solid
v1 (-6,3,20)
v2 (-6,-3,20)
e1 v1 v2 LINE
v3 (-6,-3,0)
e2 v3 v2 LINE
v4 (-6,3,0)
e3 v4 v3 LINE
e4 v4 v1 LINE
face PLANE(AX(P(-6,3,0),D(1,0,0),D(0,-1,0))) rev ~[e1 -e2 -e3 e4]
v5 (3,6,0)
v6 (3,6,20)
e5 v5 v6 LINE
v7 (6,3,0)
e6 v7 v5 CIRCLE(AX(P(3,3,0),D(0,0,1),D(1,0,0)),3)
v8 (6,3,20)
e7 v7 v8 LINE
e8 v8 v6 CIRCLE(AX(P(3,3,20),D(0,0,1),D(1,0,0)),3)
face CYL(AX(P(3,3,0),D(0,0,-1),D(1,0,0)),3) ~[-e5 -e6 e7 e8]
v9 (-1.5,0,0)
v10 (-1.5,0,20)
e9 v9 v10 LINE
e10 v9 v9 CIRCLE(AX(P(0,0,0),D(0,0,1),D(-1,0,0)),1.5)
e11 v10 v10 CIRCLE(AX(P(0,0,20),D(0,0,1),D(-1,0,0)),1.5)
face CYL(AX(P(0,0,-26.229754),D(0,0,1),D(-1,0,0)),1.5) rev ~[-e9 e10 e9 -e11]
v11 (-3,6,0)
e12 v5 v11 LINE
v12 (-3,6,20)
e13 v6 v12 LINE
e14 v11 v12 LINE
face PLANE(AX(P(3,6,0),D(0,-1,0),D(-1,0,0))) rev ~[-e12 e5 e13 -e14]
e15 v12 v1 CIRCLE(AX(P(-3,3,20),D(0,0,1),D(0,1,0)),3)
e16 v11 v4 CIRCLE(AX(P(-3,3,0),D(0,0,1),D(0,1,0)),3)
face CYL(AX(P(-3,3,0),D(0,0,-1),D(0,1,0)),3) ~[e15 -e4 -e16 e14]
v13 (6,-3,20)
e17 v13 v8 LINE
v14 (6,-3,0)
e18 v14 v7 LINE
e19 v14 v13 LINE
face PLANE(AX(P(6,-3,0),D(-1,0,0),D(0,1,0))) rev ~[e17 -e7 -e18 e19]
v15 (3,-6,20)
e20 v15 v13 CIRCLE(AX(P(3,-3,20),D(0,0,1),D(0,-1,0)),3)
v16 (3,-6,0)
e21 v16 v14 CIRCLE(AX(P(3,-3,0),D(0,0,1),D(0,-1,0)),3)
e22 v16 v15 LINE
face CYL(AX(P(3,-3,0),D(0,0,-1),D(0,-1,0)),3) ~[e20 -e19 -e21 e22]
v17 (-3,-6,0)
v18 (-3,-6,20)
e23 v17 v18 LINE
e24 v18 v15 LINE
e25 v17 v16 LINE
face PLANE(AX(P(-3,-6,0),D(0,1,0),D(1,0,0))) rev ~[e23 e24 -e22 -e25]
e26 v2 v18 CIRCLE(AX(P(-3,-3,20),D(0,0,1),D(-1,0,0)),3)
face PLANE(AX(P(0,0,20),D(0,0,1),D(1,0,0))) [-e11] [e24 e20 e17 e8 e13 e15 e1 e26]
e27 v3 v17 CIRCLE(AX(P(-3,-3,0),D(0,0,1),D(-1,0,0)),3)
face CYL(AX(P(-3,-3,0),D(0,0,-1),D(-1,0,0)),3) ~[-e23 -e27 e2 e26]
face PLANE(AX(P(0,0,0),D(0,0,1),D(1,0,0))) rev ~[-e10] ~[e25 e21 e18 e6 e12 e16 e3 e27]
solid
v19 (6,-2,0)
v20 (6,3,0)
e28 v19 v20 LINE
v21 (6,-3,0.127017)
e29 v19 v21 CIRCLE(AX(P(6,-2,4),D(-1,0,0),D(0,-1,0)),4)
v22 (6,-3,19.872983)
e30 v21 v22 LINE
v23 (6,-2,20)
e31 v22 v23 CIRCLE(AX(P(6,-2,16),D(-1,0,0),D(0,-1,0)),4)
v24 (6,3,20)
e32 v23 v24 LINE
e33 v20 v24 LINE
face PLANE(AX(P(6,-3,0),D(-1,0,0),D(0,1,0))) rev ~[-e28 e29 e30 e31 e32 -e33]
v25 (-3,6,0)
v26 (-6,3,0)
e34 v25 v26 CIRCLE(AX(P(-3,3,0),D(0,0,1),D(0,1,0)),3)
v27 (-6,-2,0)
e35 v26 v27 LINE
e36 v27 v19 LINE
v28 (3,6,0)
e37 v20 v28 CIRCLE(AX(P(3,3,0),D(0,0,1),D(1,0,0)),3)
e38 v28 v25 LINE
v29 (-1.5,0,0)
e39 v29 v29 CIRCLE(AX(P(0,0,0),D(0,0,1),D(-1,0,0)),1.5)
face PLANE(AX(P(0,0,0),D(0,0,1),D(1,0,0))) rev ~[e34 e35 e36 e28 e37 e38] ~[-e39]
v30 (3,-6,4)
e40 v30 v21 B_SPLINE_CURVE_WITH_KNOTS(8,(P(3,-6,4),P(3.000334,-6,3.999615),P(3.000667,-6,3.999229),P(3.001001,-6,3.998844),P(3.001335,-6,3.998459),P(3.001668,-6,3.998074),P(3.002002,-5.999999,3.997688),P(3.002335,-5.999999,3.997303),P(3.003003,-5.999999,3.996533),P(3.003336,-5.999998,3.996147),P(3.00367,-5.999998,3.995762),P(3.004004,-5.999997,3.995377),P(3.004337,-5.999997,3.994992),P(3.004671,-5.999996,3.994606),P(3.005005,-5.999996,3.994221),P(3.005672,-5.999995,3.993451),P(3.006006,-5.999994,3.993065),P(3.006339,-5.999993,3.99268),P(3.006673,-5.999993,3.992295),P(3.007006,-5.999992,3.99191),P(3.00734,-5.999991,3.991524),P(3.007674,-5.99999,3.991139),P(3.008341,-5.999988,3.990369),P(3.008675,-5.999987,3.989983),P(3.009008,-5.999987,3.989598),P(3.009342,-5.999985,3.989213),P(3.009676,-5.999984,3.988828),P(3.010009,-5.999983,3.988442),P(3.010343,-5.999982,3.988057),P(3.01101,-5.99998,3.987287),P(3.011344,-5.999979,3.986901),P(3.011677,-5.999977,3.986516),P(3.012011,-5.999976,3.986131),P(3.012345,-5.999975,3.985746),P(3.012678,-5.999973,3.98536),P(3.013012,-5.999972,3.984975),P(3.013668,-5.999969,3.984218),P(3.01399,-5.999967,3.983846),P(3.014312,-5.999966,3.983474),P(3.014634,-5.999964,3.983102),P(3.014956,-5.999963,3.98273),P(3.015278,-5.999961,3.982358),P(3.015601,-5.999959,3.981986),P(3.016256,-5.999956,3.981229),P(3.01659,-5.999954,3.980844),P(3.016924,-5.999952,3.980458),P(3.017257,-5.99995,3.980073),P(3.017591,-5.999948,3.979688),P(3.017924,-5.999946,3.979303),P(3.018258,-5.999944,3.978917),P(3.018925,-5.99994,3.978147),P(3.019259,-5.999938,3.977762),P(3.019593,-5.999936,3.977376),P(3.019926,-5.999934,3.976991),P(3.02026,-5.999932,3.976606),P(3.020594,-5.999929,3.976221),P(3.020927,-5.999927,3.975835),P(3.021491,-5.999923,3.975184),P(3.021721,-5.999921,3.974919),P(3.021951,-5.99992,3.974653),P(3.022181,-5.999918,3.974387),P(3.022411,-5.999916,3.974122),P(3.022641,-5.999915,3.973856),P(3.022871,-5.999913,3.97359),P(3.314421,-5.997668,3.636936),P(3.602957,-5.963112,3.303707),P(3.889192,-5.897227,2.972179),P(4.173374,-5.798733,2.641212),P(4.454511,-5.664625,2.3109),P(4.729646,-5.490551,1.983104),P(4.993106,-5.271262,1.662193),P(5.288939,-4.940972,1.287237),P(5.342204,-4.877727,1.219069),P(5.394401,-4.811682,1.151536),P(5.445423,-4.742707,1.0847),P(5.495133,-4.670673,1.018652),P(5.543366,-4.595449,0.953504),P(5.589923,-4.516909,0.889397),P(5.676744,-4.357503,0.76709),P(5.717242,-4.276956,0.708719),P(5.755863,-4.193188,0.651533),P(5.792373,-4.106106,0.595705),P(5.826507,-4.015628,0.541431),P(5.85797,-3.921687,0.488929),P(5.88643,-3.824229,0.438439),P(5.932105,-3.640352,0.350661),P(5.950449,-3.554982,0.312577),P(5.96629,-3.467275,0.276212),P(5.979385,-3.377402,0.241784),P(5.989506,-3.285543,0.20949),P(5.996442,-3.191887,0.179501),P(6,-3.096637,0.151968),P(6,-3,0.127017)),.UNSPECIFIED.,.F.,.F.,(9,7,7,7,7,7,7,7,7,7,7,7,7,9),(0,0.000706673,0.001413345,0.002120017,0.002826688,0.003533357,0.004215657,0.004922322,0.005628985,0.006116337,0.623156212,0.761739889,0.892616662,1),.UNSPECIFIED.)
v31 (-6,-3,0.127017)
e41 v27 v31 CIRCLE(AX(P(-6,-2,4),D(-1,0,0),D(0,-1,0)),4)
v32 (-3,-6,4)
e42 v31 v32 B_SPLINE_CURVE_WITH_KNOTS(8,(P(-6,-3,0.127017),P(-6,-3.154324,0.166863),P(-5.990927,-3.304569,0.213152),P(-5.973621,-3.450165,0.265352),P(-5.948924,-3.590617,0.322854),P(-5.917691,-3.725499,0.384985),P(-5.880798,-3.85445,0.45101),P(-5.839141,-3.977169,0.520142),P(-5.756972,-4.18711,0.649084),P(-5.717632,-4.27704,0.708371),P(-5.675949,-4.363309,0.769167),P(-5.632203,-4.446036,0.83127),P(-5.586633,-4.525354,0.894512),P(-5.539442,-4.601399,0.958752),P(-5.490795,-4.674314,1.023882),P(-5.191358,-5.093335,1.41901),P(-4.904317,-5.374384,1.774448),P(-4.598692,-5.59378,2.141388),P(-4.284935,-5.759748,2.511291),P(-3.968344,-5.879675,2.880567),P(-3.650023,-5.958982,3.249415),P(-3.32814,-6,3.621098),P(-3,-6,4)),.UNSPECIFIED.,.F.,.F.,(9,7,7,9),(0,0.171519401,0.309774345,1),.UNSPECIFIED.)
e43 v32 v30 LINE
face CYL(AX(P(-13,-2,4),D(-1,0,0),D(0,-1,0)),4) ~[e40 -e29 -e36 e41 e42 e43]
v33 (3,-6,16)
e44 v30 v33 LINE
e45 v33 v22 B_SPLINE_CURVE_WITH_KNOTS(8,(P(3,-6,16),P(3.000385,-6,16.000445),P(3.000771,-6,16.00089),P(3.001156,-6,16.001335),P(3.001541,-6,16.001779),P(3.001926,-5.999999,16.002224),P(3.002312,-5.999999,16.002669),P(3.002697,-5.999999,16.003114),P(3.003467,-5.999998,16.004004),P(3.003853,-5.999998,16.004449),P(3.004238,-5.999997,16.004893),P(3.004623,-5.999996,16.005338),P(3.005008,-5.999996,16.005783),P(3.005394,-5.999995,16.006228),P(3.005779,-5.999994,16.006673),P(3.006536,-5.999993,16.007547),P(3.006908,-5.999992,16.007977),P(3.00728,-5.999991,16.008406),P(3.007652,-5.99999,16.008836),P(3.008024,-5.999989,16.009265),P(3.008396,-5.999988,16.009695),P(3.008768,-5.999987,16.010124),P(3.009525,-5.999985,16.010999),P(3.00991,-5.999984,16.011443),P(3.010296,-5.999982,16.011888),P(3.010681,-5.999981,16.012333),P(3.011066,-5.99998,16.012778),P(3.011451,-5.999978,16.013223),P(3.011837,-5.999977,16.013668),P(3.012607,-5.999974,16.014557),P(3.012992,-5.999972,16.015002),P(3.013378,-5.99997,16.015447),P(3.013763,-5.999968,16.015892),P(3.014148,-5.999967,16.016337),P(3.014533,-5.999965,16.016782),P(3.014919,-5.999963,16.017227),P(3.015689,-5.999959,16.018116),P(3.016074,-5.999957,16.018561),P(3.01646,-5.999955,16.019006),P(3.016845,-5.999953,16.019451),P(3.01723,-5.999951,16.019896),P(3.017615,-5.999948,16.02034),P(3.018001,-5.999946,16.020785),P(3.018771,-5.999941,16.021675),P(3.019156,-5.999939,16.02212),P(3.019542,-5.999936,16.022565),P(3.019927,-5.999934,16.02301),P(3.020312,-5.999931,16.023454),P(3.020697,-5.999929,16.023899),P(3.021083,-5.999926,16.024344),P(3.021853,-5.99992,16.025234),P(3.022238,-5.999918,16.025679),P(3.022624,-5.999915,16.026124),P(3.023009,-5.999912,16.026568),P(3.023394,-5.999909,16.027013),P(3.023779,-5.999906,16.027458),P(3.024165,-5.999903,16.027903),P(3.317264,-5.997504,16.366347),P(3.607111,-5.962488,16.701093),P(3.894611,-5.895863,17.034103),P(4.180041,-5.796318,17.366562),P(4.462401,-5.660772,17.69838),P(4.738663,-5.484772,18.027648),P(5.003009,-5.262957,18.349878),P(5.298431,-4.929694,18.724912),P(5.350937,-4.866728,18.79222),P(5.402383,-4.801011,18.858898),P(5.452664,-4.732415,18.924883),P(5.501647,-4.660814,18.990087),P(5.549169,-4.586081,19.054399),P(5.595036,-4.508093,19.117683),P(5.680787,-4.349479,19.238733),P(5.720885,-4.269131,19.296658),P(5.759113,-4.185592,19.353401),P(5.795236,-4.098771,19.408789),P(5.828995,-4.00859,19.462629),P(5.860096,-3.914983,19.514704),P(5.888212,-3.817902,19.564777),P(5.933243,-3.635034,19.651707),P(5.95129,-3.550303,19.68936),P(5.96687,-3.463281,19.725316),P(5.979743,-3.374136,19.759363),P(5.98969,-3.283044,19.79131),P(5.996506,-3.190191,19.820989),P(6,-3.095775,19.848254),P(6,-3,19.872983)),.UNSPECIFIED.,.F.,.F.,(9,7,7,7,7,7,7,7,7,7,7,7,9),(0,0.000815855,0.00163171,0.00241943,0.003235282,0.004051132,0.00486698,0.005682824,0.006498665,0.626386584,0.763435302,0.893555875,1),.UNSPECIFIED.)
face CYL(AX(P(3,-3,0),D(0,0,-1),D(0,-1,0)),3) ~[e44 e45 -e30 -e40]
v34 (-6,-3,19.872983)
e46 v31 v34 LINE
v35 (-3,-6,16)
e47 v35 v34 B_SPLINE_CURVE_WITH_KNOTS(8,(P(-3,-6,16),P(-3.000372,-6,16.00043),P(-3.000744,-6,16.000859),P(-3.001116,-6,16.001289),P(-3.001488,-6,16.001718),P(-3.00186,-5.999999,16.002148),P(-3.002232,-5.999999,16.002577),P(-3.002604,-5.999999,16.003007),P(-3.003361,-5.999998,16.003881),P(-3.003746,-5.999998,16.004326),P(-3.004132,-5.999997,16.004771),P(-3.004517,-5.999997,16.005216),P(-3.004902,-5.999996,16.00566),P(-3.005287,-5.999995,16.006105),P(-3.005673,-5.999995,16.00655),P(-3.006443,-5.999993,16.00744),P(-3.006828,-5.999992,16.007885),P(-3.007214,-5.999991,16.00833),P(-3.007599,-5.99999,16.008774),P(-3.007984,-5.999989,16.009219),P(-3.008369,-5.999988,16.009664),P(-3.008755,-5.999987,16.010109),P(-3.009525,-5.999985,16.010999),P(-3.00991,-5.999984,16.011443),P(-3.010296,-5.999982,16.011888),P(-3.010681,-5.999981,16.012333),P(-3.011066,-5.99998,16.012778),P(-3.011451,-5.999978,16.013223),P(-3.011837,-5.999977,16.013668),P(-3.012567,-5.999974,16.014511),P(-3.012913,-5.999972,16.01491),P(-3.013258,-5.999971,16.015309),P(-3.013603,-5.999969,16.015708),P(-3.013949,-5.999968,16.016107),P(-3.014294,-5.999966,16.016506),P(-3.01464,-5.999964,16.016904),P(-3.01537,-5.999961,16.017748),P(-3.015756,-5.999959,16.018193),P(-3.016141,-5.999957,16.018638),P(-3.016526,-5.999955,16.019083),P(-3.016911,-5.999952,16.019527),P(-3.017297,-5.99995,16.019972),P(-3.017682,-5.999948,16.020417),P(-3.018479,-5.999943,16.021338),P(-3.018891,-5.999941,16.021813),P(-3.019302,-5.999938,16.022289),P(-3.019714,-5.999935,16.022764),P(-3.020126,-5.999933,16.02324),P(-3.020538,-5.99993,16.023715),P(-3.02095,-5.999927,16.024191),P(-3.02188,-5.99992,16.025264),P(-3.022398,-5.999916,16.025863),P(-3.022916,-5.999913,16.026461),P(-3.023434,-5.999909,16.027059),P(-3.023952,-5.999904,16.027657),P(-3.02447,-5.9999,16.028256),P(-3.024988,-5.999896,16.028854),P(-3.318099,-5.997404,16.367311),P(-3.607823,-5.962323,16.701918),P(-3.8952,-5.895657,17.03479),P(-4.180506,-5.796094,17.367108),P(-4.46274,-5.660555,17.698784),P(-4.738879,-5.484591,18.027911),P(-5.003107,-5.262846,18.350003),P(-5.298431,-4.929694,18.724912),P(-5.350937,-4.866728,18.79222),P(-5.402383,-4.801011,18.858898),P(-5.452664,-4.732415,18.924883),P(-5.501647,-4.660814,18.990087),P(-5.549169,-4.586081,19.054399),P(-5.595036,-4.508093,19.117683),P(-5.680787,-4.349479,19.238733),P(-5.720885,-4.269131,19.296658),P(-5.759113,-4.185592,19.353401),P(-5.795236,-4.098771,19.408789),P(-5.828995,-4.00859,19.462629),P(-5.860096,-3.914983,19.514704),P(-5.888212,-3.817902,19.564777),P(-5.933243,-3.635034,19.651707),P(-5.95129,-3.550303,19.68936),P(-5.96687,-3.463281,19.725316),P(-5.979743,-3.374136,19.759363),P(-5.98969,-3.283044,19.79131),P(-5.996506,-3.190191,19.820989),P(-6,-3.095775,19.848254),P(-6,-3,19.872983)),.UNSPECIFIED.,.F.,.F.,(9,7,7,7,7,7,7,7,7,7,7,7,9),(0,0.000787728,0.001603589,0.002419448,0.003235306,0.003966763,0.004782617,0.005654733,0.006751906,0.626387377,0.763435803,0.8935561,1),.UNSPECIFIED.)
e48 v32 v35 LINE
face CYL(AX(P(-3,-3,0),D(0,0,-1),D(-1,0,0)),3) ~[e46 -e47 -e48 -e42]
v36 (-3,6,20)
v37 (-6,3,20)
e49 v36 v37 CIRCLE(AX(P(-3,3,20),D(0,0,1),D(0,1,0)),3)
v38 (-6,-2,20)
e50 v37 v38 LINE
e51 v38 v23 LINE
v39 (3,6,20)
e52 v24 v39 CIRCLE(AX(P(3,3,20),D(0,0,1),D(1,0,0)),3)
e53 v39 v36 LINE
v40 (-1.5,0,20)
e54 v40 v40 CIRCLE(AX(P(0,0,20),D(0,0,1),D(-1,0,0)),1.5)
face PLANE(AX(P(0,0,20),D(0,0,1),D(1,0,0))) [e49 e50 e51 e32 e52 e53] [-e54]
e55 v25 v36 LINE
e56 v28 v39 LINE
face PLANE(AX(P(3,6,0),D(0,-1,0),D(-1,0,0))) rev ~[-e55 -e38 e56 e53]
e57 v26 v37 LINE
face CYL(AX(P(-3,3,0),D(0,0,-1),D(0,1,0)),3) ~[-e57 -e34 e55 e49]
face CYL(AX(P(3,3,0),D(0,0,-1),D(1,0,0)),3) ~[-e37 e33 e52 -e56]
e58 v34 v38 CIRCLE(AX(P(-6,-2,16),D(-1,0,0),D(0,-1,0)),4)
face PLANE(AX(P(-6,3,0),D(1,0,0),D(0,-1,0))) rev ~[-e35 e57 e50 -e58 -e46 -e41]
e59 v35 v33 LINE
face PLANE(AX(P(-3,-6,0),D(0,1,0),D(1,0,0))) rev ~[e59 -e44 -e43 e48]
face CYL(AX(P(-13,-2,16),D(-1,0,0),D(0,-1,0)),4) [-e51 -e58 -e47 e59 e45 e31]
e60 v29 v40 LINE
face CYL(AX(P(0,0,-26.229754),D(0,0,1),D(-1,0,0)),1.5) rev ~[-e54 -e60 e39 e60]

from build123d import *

# Parameters (mm, degrees)
F1_DEPTH    = 20
F2_DEPTH    = 20
F3_T1_DEPTH = 26
F4_D        = 3
F4_2_D      = 3


# Not quite as in the source:
# - a fillet or chamfer that OpenCascade refuses, or shapes differently, is made with other operations: its cross-section is extruded or revolved along the edge and cut away or added


with BuildPart() as f1:
    # F0 (on Top) → F1 (new body)
    with BuildSketch(Plane.XY):
        with BuildLine():
            ThreePointArc((6, 3), (5.1213203436, 5.1213203436), (3, 6))
            Line((3, 6), (-3, 6))
            ThreePointArc((-3, 6), (-5.1213203436, 5.1213203436), (-6, 3))
            Line((-6, 3), (-6, -3))
            ThreePointArc((-6, -3), (-5.1213203436, -5.1213203436), (-3, -6))
            Line((-3, -6), (3, -6))
            ThreePointArc((3, -6), (5.1213203436, -5.1213203436), (6, -3))
            Line((6, -3), (6, 3))
        make_face()
    extrude(amount=F1_DEPTH)

    # F4 (through all)
    with Locations(Plane(origin=(0, 0, 0), x_dir=(1, 0, 0), z_dir=(0, 0, -1))):
        with Locations((0, 0)):
            Hole(F4_D / 2)


with BuildPart() as f2:
    # F0 (on Top) → F2 (new body)
    with BuildSketch(Plane.XY):
        with BuildLine():
            ThreePointArc((6, 3), (5.1213203436, 5.1213203436), (3, 6))
            Line((3, 6), (-3, 6))
            ThreePointArc((-3, 6), (-5.1213203436, 5.1213203436), (-6, 3))
            Line((-6, 3), (-6, -3))
            ThreePointArc((-6, -3), (-5.1213203436, -5.1213203436), (-3, -6))
            Line((-3, -6), (3, -6))
            ThreePointArc((3, -6), (5.1213203436, -5.1213203436), (6, -3))
            Line((6, -3), (6, 3))
        make_face()
    extrude(amount=F2_DEPTH)

    # F3: fillet of radius 4 on 2 edges, made by hand

    # F3_s2 → F3_t1 (cut)
    with BuildSketch(Plane.YZ.offset(-13)):
        with BuildLine():
            ThreePointArc((-6, 16), (-4.8284271247, 18.8284271247), (-2, 20))
            Line((-2, 20), (-6, 20))
            Line((-6, 20), (-6, 16))
        make_face()
        with BuildLine():
            ThreePointArc((-6, 4), (-4.8284271247, 1.1715728753), (-2, 0))
            Line((-2, 0), (-6, 0))
            Line((-6, 0), (-6, 4))
        make_face()
    extrude(amount=F3_T1_DEPTH, mode=Mode.SUBTRACT)

    # F4#2 (through all)
    with Locations(Plane(origin=(0, 0, 0), x_dir=(1, 0, 0), z_dir=(0, 0, -1))):
        with Locations((0, 0)):
            Hole(F4_2_D / 2)


solid = Compound([f1.part, f2.part])
